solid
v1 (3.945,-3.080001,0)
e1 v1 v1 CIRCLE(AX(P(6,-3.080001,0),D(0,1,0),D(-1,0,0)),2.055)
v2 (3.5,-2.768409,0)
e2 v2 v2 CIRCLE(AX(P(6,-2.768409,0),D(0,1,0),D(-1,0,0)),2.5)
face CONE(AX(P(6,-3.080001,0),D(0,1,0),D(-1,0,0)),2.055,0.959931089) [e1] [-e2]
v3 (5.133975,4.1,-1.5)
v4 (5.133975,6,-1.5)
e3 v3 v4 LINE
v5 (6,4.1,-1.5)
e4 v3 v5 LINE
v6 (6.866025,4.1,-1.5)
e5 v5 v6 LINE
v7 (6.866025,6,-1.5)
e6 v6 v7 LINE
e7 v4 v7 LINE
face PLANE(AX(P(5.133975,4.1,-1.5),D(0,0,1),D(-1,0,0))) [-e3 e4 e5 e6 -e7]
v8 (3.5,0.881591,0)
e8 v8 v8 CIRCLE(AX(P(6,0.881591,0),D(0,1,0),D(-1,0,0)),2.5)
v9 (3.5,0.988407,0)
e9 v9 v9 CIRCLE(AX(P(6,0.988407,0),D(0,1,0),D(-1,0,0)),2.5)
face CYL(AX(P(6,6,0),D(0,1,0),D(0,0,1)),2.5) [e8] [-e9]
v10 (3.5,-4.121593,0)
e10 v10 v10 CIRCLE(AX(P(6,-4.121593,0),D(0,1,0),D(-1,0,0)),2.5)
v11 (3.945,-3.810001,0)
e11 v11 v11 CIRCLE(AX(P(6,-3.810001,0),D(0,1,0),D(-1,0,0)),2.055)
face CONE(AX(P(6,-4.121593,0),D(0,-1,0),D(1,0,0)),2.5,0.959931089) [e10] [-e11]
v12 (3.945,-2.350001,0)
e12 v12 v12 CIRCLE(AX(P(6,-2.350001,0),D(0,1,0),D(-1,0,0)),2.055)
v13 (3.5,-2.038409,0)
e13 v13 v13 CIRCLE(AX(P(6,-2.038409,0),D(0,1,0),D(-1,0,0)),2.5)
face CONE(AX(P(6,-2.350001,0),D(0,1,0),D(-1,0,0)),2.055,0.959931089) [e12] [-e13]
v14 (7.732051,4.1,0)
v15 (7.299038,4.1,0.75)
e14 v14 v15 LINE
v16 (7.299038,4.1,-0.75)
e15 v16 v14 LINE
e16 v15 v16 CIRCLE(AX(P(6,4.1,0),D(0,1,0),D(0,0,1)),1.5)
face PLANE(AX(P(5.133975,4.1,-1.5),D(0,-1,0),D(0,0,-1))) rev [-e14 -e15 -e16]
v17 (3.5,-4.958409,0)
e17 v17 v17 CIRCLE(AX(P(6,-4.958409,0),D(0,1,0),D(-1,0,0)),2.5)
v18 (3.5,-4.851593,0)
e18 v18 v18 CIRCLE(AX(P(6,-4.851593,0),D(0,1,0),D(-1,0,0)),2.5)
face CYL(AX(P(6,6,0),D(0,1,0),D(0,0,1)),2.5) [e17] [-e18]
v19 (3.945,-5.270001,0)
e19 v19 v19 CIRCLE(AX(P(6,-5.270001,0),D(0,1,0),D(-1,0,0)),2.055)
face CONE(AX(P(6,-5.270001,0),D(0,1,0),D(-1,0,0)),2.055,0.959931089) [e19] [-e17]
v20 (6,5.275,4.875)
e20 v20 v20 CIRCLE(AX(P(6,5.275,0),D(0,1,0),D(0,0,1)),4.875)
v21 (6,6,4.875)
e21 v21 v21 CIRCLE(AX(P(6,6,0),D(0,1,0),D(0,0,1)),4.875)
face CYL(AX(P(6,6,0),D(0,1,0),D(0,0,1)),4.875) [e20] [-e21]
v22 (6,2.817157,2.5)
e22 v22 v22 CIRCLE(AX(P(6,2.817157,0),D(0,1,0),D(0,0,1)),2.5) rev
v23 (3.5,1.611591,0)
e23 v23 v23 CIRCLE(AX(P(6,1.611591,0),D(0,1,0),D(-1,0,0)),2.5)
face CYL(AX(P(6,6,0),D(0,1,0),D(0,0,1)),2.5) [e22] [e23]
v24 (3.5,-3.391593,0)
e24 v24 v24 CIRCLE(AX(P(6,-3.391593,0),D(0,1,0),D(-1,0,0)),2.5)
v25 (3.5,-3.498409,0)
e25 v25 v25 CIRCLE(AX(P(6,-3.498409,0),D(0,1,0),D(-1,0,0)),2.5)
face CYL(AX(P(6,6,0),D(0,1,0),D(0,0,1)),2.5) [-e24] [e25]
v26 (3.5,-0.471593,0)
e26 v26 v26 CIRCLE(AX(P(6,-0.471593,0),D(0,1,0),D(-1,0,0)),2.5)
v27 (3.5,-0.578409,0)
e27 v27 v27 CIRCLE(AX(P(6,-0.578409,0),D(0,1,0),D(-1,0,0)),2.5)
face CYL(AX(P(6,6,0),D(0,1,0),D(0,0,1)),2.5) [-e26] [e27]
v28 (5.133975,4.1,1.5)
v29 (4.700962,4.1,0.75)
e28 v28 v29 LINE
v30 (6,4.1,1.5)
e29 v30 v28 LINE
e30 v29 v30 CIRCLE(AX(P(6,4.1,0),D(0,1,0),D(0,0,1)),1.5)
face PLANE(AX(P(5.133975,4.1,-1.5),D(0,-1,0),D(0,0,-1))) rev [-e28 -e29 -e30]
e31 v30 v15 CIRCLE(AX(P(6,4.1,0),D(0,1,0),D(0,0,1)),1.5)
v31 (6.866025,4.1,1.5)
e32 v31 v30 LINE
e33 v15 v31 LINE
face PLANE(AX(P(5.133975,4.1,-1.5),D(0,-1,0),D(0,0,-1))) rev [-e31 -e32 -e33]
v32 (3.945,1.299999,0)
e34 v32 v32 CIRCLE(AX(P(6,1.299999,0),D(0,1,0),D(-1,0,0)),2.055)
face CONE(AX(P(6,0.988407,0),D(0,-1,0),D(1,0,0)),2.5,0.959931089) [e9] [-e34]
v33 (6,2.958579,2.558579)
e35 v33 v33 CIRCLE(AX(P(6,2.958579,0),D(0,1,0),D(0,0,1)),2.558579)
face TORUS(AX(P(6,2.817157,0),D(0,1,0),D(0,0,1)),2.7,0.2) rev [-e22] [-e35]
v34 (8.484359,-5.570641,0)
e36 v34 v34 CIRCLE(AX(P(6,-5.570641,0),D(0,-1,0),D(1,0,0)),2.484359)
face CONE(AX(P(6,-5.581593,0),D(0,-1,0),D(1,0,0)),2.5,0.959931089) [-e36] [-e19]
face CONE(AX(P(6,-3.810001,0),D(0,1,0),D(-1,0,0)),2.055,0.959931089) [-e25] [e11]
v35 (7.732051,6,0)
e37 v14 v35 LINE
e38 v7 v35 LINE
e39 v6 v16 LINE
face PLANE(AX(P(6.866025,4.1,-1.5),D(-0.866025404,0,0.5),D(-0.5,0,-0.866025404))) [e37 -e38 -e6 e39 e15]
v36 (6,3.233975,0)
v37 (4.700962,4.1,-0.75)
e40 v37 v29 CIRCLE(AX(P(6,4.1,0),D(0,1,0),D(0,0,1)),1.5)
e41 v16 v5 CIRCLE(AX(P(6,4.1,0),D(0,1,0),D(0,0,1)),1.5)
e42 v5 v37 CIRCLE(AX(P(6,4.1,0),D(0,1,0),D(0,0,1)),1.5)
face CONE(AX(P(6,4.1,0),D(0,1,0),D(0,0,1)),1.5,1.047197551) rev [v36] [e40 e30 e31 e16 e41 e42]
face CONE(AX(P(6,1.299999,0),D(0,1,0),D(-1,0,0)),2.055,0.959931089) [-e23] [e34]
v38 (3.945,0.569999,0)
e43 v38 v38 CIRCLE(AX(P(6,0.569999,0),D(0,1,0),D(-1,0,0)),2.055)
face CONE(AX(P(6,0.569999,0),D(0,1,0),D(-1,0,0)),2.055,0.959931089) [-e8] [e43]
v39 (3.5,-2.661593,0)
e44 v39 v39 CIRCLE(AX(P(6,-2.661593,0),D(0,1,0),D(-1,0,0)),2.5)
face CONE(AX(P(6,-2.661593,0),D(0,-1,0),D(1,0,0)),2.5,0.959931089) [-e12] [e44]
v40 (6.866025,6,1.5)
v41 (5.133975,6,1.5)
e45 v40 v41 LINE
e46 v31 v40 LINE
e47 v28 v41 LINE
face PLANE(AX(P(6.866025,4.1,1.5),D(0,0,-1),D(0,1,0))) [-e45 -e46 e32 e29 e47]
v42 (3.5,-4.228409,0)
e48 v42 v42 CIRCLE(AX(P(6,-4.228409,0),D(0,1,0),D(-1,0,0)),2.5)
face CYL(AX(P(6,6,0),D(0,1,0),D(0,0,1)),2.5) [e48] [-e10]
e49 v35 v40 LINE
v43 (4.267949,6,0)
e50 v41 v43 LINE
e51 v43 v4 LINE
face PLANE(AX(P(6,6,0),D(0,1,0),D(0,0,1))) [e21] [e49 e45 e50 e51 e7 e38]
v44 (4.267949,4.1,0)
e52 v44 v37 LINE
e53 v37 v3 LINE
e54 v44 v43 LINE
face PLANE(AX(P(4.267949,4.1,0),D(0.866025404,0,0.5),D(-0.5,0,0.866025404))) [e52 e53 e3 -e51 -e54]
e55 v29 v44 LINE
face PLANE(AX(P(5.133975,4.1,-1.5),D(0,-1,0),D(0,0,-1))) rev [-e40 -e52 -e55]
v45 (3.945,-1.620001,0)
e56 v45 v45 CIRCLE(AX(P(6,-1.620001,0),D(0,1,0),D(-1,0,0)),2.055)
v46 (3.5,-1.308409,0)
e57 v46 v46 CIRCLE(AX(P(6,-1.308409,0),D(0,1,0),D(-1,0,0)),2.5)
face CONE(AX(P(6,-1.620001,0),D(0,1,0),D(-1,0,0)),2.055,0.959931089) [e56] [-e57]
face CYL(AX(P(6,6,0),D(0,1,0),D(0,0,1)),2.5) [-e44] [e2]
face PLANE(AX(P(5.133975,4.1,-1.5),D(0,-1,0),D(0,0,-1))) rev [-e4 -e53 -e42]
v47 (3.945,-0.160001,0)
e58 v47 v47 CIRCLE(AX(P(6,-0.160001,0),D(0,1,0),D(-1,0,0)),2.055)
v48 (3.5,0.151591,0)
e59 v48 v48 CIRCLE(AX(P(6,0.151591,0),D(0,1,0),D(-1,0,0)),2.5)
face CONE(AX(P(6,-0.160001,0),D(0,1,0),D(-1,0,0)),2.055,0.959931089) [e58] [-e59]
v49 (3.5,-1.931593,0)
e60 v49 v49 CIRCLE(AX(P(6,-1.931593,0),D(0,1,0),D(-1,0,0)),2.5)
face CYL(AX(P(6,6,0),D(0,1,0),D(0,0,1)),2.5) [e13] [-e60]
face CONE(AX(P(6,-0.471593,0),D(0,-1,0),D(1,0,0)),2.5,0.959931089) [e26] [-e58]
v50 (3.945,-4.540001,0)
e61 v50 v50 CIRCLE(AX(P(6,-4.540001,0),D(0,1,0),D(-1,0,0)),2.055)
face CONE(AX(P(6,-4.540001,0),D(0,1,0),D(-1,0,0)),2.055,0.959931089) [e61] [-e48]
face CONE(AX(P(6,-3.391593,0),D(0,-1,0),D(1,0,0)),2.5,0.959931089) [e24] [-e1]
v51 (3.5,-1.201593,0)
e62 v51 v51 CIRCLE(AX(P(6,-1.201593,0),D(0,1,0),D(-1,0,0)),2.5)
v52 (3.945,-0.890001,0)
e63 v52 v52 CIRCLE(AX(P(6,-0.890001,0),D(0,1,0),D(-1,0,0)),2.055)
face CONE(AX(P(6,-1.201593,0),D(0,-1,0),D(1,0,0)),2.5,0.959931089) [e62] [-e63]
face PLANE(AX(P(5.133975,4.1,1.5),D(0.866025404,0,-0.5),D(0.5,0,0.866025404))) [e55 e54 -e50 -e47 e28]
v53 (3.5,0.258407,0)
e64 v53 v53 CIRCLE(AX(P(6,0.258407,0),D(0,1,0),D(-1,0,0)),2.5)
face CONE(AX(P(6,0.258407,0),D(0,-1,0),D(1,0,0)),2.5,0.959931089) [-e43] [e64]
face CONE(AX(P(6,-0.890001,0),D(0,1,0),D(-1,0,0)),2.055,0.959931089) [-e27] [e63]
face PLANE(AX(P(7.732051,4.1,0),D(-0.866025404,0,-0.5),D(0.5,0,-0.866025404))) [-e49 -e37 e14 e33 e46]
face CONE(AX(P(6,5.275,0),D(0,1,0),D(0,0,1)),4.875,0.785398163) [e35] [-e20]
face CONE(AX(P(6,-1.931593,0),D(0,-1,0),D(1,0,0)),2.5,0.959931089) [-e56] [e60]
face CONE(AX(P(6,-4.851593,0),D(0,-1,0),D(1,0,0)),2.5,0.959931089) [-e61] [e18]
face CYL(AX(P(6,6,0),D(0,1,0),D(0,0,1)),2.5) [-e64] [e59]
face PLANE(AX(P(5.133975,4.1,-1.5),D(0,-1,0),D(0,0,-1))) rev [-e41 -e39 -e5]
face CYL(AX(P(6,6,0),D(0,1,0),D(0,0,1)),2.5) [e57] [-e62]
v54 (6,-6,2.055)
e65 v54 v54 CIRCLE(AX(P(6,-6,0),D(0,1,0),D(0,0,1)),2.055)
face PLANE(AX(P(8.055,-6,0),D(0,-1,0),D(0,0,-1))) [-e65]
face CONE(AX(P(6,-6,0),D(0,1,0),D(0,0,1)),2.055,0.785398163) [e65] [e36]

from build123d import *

# Parameters (mm, degrees)
FILLET1_R             = 0.2
HEX_START             = -1.9
HEX_2_DEPTH           = 1.9
THDSCHPAT_COUNT       = 10
THDSCHPAT_PITCH       = 0.73
BODY_MOVE_COPY1_ANGLE = 90


with BuildPart() as part:
    # BodySke → BaseBody (revolve)
    with BuildSketch(Plane.XY, mode=Mode.PRIVATE) as basebody_sk:
        Polygon((0, 0), (0, 4.875), (0.725, 4.875), (3.1, 2.5), (11.555, 2.5), (12, 2.055), (12, 0), align=None)
    revolve(basebody_sk.sketch.rotate(Axis((0, 0, 0), (1, 0, 0)), 90), axis=Axis((0, 0, 0), (1, 0, 0)))

    # Fillet1
    fillet1_edges = [part.edges().sort_by_distance(p)[0] for p in [
        (3.1, 0, -2.5),
    ]]
    fillet(fillet1_edges, radius=FILLET1_R)

    # Hex 2: read off the stored shape, not the designer's step
    # Hex 2 outline → Hex 2 (cut)
    with BuildSketch(Plane.ZY.offset(HEX_START)):
        Polygon((-1.5, -0.866025404), (0, -1.732050808), (1.5, -0.866025404), (1.5, 0.866025404), (0, 1.732050808), (-1.5, 0.866025404), align=None)
    extrude(amount=HEX_2_DEPTH, mode=Mode.SUBTRACT)

    # Hex 2 2 outline → Hex 2 2 (revolve, cut)
    with BuildSketch(Plane.YX):
        Polygon((1.5, 1.9), (0, 2.766025404), (0, 1.9), align=None)
    revolve(axis=Axis((0, 0, 0), (1, 0, 0)), mode=Mode.SUBTRACT)

    # ThdSchSke → ThreadSchematic (revolve, cut)
    with BuildSketch(Plane.XY, mode=Mode.PRIVATE) as threadschematic_sk:
        Polygon((4.700001, -2.055), (4.388408645, -2.5), (4.388408645, -3.125), (5.011593355, -3.125), (5.011593355, -2.5), align=None)
    threadschematic = revolve(threadschematic_sk.sketch.rotate(Axis((-3.175, 0, 0), (1, 0, 0)), 270), axis=Axis((-3.175, 0, 0), (1, 0, 0)), mode=Mode.SUBTRACT)

    # ThdSchPat: ThreadSchematic ×10
    with Locations(*[(i * THDSCHPAT_PITCH, 0, 0) for i in range(1, THDSCHPAT_COUNT)]):
        add(threadschematic, mode=Mode.SUBTRACT)


with BuildPart() as part_1:
    # Body-Move/Copy1: moved
    add(part.part.rotate(Axis((6, 0, 0), (0, 0, -1)), BODY_MOVE_COPY1_ANGLE))


solid = part_1.part
